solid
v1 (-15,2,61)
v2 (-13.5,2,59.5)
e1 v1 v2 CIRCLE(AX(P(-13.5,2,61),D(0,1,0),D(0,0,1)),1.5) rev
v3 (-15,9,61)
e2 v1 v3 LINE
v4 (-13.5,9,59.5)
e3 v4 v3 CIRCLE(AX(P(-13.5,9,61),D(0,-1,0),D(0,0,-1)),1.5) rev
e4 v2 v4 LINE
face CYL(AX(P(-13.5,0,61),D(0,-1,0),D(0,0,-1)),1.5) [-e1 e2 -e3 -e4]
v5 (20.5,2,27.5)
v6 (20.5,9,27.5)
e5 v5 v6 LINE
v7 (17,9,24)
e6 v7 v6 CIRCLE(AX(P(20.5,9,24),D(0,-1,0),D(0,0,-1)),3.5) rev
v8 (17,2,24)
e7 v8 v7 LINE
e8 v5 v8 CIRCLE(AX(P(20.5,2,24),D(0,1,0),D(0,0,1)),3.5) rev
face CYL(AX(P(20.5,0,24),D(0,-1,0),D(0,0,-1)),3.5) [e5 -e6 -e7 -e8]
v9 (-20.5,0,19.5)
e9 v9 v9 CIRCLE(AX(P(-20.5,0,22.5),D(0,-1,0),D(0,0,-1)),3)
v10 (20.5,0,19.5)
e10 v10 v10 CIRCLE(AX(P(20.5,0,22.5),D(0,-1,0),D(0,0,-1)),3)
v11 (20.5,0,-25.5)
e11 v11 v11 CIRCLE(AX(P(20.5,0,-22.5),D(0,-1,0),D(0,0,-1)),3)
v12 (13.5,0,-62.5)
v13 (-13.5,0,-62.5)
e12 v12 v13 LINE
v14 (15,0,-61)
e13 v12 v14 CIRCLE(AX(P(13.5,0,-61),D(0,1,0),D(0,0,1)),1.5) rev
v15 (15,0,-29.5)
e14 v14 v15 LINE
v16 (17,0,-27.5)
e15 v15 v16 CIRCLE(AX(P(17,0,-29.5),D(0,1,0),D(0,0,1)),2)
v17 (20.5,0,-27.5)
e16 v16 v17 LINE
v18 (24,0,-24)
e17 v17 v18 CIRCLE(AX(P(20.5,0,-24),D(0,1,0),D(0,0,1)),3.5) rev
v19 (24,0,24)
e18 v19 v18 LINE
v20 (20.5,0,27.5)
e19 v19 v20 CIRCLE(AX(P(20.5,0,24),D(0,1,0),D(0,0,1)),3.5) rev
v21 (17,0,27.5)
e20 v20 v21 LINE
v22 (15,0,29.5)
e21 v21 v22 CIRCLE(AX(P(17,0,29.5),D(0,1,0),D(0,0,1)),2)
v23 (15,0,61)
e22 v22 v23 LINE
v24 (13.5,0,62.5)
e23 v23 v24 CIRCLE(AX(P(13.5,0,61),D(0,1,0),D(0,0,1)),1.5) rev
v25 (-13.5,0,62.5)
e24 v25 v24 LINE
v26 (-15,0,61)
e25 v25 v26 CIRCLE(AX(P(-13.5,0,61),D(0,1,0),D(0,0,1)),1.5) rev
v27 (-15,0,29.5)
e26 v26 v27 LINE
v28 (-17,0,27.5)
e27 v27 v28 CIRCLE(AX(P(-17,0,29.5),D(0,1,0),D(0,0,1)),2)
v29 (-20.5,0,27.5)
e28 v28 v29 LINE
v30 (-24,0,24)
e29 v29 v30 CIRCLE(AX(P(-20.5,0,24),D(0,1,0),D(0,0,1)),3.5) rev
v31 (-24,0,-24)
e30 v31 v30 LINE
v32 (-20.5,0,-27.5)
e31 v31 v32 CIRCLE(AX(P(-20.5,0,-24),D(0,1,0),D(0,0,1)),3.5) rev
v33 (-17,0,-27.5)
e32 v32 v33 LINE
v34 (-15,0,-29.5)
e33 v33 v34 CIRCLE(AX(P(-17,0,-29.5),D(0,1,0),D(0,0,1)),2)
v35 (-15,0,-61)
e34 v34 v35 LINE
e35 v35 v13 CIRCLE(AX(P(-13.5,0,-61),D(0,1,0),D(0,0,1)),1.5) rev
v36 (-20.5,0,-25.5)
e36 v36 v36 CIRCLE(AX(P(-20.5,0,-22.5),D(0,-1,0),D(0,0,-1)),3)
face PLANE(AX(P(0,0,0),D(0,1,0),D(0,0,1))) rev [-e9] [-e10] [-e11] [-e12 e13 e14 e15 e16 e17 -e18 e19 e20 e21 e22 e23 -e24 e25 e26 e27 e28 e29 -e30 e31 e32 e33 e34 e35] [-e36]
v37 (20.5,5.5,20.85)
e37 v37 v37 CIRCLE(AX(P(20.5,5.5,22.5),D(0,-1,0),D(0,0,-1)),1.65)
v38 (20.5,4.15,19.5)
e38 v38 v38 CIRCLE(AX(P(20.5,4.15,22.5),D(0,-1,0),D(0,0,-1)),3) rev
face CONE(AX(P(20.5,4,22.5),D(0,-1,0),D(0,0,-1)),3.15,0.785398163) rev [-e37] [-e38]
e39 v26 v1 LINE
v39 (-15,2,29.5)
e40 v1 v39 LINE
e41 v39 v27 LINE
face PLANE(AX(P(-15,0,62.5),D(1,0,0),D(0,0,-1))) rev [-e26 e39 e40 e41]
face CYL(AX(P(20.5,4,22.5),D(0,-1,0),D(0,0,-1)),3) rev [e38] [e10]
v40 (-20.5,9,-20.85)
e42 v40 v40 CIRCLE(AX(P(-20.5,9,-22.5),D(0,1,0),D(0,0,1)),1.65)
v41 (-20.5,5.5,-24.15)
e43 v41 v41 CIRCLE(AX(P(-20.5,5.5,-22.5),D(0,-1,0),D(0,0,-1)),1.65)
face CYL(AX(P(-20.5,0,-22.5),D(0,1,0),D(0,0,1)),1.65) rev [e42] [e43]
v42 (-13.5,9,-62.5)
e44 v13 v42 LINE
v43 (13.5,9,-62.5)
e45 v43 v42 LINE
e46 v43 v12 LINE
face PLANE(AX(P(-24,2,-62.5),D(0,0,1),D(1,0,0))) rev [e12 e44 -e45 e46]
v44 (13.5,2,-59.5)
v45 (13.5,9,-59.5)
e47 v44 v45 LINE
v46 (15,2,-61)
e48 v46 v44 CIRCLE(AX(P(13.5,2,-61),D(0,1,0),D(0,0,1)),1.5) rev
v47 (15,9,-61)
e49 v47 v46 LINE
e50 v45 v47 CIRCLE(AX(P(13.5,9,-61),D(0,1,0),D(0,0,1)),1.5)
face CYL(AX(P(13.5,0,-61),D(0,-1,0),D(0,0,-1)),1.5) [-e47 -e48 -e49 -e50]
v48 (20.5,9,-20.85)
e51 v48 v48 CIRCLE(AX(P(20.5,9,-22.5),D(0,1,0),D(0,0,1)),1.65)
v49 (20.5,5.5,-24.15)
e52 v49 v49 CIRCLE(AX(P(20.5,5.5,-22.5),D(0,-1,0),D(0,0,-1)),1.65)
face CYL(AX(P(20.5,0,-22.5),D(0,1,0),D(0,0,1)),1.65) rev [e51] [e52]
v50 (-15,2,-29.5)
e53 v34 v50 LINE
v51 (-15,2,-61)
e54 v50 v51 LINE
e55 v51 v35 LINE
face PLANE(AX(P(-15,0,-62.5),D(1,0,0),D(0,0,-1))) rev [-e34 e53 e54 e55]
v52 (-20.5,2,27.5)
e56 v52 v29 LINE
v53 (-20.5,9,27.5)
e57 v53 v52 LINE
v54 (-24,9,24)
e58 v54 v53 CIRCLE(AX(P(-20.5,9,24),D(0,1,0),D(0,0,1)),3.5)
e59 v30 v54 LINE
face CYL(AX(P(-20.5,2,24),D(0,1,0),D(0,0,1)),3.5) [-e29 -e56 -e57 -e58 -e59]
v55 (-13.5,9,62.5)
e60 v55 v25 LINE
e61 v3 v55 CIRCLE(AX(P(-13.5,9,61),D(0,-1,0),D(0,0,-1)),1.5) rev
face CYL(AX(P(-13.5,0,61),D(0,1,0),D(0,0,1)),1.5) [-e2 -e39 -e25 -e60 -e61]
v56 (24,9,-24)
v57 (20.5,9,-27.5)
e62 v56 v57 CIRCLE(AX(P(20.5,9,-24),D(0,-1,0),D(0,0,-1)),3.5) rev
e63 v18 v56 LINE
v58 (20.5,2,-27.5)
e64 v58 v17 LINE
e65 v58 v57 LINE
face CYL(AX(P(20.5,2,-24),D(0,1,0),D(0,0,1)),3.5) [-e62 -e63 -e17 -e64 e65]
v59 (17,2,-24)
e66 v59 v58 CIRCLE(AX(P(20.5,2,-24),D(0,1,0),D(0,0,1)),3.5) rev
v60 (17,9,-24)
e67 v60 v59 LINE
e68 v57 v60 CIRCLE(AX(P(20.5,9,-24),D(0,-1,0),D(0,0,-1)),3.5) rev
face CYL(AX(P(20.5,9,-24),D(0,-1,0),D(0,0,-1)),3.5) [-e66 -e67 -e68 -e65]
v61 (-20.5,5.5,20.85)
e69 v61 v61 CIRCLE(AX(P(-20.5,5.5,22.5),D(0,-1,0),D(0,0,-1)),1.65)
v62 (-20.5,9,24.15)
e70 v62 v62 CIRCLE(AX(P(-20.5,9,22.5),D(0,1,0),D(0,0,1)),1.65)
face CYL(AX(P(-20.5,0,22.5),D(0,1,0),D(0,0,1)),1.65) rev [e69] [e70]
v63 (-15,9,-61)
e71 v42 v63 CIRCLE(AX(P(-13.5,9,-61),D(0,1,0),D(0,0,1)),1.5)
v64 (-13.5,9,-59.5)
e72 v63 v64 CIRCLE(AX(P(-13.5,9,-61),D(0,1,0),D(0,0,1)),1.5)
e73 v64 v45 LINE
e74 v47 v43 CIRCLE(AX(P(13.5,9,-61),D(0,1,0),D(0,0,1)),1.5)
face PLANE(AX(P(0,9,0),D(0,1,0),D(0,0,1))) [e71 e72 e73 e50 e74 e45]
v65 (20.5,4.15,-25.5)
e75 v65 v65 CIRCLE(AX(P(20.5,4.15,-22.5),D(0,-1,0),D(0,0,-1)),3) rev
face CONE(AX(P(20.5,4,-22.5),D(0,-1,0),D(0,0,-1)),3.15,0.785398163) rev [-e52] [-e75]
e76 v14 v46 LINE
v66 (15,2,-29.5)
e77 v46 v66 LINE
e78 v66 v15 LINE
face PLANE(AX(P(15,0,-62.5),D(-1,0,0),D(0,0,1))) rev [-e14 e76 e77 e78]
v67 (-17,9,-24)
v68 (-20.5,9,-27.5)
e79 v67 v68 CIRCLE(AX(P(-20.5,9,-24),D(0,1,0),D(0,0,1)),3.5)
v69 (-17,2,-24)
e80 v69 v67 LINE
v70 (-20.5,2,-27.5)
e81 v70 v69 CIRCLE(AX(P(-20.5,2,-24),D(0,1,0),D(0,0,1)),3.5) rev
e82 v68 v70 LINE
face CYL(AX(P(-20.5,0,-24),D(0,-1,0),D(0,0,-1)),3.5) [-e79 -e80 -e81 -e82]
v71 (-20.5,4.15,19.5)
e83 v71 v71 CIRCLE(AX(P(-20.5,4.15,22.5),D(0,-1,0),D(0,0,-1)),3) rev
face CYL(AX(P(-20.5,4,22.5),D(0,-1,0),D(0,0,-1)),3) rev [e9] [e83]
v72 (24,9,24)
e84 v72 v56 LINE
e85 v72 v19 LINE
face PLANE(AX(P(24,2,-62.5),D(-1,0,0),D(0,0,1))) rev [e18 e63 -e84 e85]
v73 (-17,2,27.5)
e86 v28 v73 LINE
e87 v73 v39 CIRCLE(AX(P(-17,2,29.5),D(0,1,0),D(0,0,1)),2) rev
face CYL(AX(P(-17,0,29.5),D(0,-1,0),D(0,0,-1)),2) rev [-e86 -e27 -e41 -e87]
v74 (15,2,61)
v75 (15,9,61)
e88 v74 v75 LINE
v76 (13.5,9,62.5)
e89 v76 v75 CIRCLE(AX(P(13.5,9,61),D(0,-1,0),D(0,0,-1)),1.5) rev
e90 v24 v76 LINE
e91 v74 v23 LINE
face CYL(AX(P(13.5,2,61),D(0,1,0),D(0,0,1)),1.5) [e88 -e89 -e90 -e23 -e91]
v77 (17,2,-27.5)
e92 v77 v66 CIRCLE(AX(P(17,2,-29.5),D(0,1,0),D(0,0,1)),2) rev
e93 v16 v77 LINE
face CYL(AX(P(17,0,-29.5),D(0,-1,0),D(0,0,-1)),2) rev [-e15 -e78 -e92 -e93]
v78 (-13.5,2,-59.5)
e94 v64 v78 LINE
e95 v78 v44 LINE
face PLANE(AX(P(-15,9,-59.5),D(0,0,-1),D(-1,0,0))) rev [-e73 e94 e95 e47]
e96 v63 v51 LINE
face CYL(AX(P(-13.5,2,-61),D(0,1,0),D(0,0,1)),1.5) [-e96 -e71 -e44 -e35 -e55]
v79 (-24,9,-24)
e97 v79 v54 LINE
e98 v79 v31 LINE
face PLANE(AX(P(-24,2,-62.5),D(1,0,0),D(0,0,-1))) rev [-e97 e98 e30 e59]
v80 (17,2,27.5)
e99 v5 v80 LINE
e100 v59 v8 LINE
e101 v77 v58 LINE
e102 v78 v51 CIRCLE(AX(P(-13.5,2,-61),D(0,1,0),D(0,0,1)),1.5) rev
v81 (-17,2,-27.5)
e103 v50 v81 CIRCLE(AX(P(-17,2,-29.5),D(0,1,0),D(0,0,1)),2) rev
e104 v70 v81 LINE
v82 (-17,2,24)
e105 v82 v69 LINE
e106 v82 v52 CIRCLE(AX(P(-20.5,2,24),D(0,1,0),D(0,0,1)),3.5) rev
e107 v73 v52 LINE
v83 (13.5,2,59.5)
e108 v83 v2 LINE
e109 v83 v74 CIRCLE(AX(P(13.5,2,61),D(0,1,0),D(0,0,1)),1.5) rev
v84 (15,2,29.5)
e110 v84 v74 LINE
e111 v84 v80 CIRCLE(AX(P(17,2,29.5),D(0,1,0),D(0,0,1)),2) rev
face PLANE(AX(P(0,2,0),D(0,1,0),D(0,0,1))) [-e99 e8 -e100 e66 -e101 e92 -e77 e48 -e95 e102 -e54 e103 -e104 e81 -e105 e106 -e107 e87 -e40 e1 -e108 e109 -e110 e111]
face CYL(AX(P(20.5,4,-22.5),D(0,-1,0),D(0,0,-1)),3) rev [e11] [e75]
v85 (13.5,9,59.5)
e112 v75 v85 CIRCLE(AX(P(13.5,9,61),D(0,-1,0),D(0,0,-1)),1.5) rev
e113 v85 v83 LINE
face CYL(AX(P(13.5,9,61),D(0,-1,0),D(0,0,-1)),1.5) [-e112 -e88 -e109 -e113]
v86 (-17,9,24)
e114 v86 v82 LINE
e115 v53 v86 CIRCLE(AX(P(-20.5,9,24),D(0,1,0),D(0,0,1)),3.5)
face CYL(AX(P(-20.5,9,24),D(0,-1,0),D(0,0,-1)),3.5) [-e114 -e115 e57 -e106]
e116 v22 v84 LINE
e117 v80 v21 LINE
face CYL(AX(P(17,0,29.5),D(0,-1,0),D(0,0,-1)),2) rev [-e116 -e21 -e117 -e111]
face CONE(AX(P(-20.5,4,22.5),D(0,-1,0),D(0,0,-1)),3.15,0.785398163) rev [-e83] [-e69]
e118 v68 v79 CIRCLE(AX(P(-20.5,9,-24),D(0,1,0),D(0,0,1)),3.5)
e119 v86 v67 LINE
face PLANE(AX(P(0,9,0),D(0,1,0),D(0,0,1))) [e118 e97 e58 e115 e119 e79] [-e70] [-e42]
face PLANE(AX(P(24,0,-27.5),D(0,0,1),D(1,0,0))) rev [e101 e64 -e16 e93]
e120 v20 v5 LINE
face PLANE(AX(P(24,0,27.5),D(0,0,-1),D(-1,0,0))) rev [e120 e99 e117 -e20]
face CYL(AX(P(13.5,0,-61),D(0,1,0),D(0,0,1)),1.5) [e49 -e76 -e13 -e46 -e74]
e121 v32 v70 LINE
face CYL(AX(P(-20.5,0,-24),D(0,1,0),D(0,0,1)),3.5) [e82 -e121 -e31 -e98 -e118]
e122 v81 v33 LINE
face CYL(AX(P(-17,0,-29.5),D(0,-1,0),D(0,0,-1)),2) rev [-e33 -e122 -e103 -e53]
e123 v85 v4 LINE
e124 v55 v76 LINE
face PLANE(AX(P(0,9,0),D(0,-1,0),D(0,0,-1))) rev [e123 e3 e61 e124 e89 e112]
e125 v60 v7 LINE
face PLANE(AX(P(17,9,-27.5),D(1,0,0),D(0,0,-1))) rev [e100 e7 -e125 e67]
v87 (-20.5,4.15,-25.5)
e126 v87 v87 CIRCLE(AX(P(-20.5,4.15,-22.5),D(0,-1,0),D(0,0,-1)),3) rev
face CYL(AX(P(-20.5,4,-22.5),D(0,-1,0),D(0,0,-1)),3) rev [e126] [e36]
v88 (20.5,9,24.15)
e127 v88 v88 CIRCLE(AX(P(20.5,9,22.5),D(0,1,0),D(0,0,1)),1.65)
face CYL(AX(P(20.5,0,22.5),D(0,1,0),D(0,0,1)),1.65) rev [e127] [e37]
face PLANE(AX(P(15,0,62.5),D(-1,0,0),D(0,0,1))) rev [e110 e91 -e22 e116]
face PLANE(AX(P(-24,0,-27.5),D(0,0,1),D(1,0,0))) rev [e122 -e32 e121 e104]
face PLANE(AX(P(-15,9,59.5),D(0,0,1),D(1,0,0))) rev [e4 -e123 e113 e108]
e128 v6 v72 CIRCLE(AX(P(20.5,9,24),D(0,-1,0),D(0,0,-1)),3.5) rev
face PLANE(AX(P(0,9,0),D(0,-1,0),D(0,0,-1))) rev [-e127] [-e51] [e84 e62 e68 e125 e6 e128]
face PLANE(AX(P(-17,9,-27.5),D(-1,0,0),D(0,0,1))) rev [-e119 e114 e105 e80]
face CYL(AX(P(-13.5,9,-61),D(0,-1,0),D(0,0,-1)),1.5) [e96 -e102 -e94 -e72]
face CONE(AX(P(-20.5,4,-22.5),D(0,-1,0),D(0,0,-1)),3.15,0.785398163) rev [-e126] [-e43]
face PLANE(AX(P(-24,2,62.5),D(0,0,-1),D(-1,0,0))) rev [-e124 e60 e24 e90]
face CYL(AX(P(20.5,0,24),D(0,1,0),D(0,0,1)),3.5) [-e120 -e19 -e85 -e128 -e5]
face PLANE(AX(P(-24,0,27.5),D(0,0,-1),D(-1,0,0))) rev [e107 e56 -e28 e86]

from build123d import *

# Parameters (mm, degrees)
SKETCH_1_W             = 48
SKETCH_1_H             = 125
EXTRUDE_403_DEPTH      = 2
SKETCH_2_W             = 9
SKETCH_2_H             = 35
CUT_EXTRUDE_733_DEPTH  = 67.979474468
SKETCH_3_W             = 7
SKETCH_3_H             = 55
EXTRUDE_1088_DEPTH     = 7
SKETCH_4_W             = 30
SKETCH_4_H             = 3
EXTRUDE_1396_DEPTH     = 7
SKETCH_5_R             = 1.65
CUT_EXTRUDE_1704_DEPTH = 68.551831951
SKETCH_7_R             = 3
CUT_EXTRUDE_2019_DEPTH = 4
CHAMFER_1_SIZE         = 1.5
FILLET_1_R             = 1.5
FILLET_2_R             = 2
FILLET_3_R             = 3.5


# Some blends are built 0.0001 mm under size
with BuildPart() as part:
    # Эскиз1 → Extrude 403 (new body)
    with BuildSketch(Plane(origin=(0, 0, 0), x_dir=(1, 0, 0), z_dir=(0, 1, 0))):
        Rectangle(SKETCH_1_W, SKETCH_1_H)
    extrude(amount=EXTRUDE_403_DEPTH)

    # Эскиз2 → Cut-Extrude 733 (cut, through all)
    with BuildSketch(Plane(origin=(0, 2, 0), x_dir=(1, 0, 0), z_dir=(0, 1, 0))):
        with Locations((-19.5, 45)):
            Rectangle(SKETCH_2_W, SKETCH_2_H)
        with Locations((19.5, 45)):
            Rectangle(SKETCH_2_W, SKETCH_2_H)
        with Locations((19.5, -45)):
            Rectangle(SKETCH_2_W, SKETCH_2_H)
        with Locations((-19.5, -45)):
            Rectangle(SKETCH_2_W, SKETCH_2_H)
    extrude(amount=-CUT_EXTRUDE_733_DEPTH, mode=Mode.SUBTRACT)

    # Эскиз3 → Extrude 1088 (add)
    with BuildSketch(Plane(origin=(0, 2, 0), x_dir=(1, 0, 0), z_dir=(0, 1, 0))):
        with Locations((-20.5, 0)):
            Rectangle(SKETCH_3_W, SKETCH_3_H)
        with Locations((20.5, 0)):
            Rectangle(SKETCH_3_W, SKETCH_3_H)
    extrude(amount=EXTRUDE_1088_DEPTH)

    # Эскиз4 → Extrude 1396 (add)
    with BuildSketch(Plane(origin=(0, 2, 0), x_dir=(1, 0, 0), z_dir=(0, 1, 0))):
        with Locations((0, 61)):
            Rectangle(SKETCH_4_W, SKETCH_4_H)
        with Locations((0, -61)):
            Rectangle(SKETCH_4_W, SKETCH_4_H)
    extrude(amount=EXTRUDE_1396_DEPTH)

    # Эскиз5 → Cut-Extrude 1704 (cut, through all)
    with BuildSketch(Plane(origin=(0, 9, 0), x_dir=(1, 0, 0), z_dir=(0, 1, 0))):
        with Locations(Location((-20.5, 22.5, 0), (0, 0, 270))):
            Circle(SKETCH_5_R)
        with Locations(Location((-20.5, -22.5, 0), (0, 0, 270))):
            Circle(SKETCH_5_R)
        with Locations(Location((20.5, -22.5, 0), (0, 0, 270))):
            Circle(SKETCH_5_R)
        with Locations(Location((20.5, 22.5, 0), (0, 0, 270))):
            Circle(SKETCH_5_R)
    extrude(amount=-CUT_EXTRUDE_1704_DEPTH, mode=Mode.SUBTRACT)

    # Эскиз7 → Cut-Extrude 2019 (cut)
    with BuildSketch(Plane.XZ):
        with Locations(Location((-20.5, 22.5, 0), (0, 0, 270))):
            Circle(SKETCH_7_R)
        with Locations(Location((-20.5, -22.5, 0), (0, 0, 270))):
            Circle(SKETCH_7_R)
        with Locations(Location((20.5, 22.5, 0), (0, 0, 270))):
            Circle(SKETCH_7_R)
        with Locations(Location((20.5, -22.5, 0), (0, 0, 270))):
            Circle(SKETCH_7_R)
    extrude(amount=-CUT_EXTRUDE_2019_DEPTH, mode=Mode.SUBTRACT)

    # Фаска1
    # the kernel refuses this chamfer: 1.5 mm, written as the material it takes off along each edge
    with BuildSketch(Plane(origin=(-20.5, 4, 22.5), x_dir=(0, 0, 1), z_dir=(-1, 0, 0))) as chamfer_1_piece_1_section:
        Polygon((1.65 + CHAMFER_1_SIZE, 0), (1.65, CHAMFER_1_SIZE), (1.65, 0), align=None)
    chamfer_1_piece_1 = revolve(axis=Axis((-20.5, 4, 22.5), (0, 1, 0)), mode=Mode.PRIVATE)
    chamfer_1_piece_1 = chamfer_1_piece_1 & Plane(origin=(-20.5, 4.828305934, 22.5), x_dir=(0, 0, -1), z_dir=(0, -1, 0)) * Cylinder(3, 13, mode=Mode.PRIVATE)
    add(chamfer_1_piece_1, mode=Mode.SUBTRACT)
    with BuildSketch(Plane(origin=(-20.5, 4, -22.5), x_dir=(0, 0, 1), z_dir=(-1, 0, 0))) as chamfer_1_piece_2_section:
        Polygon((1.65 + CHAMFER_1_SIZE, 0), (1.65, CHAMFER_1_SIZE), (1.65, 0), align=None)
    chamfer_1_piece_2 = revolve(axis=Axis((-20.5, 4, -22.5), (0, 1, 0)), mode=Mode.PRIVATE)
    chamfer_1_piece_2 = chamfer_1_piece_2 & Plane(origin=(-20.5, 4.828305934, -22.5), x_dir=(0, 0, -1), z_dir=(0, -1, 0)) * Cylinder(3, 13, mode=Mode.PRIVATE)
    add(chamfer_1_piece_2, mode=Mode.SUBTRACT)
    with BuildSketch(Plane(origin=(20.5, 4, -22.5), x_dir=(0, 0, 1), z_dir=(-1, 0, 0))) as chamfer_1_piece_3_section:
        Polygon((1.65 + CHAMFER_1_SIZE, 0), (1.65, CHAMFER_1_SIZE), (1.65, 0), align=None)
    chamfer_1_piece_3 = revolve(axis=Axis((20.5, 4, -22.5), (0, 1, 0)), mode=Mode.PRIVATE)
    chamfer_1_piece_3 = chamfer_1_piece_3 & Plane(origin=(20.5, 4.828305934, -22.5), x_dir=(0, 0, -1), z_dir=(0, -1, 0)) * Cylinder(3, 13, mode=Mode.PRIVATE)
    add(chamfer_1_piece_3, mode=Mode.SUBTRACT)
    with BuildSketch(Plane(origin=(20.5, 4, 22.5), x_dir=(0, 0, 1), z_dir=(-1, 0, 0))) as chamfer_1_piece_4_section:
        Polygon((1.65 + CHAMFER_1_SIZE, 0), (1.65, CHAMFER_1_SIZE), (1.65, 0), align=None)
    chamfer_1_piece_4 = revolve(axis=Axis((20.5, 4, 22.5), (0, 1, 0)), mode=Mode.PRIVATE)
    chamfer_1_piece_4 = chamfer_1_piece_4 & Plane(origin=(20.5, 4.828305934, 22.5), x_dir=(0, 0, -1), z_dir=(0, -1, 0)) * Cylinder(3, 13, mode=Mode.PRIVATE)
    add(chamfer_1_piece_4, mode=Mode.SUBTRACT)

    # Скругление1
    fillet_1_edges = [part.edges().sort_by_distance(p)[0] for p in [
        (-15, 5.5, 59.5),
        (-15, 4.5, 62.5),
        (15, 4.5, 62.5),
        (15, 5.5, 59.5),
        (15, 4.5, -62.5),
        (15, 5.5, -59.5),
        (-15, 5.5, -59.5),
        (-15, 4.5, -62.5),
    ]]
    fillet(fillet_1_edges, radius=FILLET_1_R - 0.0001)  # a hair under: the kernel refuses the full size

    # Скругление2
    fillet_2_edges = [part.edges().sort_by_distance(p)[0] for p in [
        (15, 1, -27.5),
        (-15, 1, -27.5),
        (-15, 1, 27.5),
        (15, 1, 27.5),
    ]]
    fillet(fillet_2_edges, radius=FILLET_2_R)

    # Скругление3
    fillet_3_edges = [part.edges().sort_by_distance(p)[0] for p in [
        (-17, 5.5, 27.5),
        (-24, 4.5, 27.5),
        (-24, 4.5, -27.5),
        (-17, 5.5, -27.5),
        (24, 4.5, -27.5),
        (17, 5.5, -27.5),
        (17, 5.5, 27.5),
        (24, 4.5, 27.5),
    ]]
    fillet(fillet_3_edges, radius=FILLET_3_R - 0.0001)  # a hair under: the kernel refuses the full size


solid = part.part
